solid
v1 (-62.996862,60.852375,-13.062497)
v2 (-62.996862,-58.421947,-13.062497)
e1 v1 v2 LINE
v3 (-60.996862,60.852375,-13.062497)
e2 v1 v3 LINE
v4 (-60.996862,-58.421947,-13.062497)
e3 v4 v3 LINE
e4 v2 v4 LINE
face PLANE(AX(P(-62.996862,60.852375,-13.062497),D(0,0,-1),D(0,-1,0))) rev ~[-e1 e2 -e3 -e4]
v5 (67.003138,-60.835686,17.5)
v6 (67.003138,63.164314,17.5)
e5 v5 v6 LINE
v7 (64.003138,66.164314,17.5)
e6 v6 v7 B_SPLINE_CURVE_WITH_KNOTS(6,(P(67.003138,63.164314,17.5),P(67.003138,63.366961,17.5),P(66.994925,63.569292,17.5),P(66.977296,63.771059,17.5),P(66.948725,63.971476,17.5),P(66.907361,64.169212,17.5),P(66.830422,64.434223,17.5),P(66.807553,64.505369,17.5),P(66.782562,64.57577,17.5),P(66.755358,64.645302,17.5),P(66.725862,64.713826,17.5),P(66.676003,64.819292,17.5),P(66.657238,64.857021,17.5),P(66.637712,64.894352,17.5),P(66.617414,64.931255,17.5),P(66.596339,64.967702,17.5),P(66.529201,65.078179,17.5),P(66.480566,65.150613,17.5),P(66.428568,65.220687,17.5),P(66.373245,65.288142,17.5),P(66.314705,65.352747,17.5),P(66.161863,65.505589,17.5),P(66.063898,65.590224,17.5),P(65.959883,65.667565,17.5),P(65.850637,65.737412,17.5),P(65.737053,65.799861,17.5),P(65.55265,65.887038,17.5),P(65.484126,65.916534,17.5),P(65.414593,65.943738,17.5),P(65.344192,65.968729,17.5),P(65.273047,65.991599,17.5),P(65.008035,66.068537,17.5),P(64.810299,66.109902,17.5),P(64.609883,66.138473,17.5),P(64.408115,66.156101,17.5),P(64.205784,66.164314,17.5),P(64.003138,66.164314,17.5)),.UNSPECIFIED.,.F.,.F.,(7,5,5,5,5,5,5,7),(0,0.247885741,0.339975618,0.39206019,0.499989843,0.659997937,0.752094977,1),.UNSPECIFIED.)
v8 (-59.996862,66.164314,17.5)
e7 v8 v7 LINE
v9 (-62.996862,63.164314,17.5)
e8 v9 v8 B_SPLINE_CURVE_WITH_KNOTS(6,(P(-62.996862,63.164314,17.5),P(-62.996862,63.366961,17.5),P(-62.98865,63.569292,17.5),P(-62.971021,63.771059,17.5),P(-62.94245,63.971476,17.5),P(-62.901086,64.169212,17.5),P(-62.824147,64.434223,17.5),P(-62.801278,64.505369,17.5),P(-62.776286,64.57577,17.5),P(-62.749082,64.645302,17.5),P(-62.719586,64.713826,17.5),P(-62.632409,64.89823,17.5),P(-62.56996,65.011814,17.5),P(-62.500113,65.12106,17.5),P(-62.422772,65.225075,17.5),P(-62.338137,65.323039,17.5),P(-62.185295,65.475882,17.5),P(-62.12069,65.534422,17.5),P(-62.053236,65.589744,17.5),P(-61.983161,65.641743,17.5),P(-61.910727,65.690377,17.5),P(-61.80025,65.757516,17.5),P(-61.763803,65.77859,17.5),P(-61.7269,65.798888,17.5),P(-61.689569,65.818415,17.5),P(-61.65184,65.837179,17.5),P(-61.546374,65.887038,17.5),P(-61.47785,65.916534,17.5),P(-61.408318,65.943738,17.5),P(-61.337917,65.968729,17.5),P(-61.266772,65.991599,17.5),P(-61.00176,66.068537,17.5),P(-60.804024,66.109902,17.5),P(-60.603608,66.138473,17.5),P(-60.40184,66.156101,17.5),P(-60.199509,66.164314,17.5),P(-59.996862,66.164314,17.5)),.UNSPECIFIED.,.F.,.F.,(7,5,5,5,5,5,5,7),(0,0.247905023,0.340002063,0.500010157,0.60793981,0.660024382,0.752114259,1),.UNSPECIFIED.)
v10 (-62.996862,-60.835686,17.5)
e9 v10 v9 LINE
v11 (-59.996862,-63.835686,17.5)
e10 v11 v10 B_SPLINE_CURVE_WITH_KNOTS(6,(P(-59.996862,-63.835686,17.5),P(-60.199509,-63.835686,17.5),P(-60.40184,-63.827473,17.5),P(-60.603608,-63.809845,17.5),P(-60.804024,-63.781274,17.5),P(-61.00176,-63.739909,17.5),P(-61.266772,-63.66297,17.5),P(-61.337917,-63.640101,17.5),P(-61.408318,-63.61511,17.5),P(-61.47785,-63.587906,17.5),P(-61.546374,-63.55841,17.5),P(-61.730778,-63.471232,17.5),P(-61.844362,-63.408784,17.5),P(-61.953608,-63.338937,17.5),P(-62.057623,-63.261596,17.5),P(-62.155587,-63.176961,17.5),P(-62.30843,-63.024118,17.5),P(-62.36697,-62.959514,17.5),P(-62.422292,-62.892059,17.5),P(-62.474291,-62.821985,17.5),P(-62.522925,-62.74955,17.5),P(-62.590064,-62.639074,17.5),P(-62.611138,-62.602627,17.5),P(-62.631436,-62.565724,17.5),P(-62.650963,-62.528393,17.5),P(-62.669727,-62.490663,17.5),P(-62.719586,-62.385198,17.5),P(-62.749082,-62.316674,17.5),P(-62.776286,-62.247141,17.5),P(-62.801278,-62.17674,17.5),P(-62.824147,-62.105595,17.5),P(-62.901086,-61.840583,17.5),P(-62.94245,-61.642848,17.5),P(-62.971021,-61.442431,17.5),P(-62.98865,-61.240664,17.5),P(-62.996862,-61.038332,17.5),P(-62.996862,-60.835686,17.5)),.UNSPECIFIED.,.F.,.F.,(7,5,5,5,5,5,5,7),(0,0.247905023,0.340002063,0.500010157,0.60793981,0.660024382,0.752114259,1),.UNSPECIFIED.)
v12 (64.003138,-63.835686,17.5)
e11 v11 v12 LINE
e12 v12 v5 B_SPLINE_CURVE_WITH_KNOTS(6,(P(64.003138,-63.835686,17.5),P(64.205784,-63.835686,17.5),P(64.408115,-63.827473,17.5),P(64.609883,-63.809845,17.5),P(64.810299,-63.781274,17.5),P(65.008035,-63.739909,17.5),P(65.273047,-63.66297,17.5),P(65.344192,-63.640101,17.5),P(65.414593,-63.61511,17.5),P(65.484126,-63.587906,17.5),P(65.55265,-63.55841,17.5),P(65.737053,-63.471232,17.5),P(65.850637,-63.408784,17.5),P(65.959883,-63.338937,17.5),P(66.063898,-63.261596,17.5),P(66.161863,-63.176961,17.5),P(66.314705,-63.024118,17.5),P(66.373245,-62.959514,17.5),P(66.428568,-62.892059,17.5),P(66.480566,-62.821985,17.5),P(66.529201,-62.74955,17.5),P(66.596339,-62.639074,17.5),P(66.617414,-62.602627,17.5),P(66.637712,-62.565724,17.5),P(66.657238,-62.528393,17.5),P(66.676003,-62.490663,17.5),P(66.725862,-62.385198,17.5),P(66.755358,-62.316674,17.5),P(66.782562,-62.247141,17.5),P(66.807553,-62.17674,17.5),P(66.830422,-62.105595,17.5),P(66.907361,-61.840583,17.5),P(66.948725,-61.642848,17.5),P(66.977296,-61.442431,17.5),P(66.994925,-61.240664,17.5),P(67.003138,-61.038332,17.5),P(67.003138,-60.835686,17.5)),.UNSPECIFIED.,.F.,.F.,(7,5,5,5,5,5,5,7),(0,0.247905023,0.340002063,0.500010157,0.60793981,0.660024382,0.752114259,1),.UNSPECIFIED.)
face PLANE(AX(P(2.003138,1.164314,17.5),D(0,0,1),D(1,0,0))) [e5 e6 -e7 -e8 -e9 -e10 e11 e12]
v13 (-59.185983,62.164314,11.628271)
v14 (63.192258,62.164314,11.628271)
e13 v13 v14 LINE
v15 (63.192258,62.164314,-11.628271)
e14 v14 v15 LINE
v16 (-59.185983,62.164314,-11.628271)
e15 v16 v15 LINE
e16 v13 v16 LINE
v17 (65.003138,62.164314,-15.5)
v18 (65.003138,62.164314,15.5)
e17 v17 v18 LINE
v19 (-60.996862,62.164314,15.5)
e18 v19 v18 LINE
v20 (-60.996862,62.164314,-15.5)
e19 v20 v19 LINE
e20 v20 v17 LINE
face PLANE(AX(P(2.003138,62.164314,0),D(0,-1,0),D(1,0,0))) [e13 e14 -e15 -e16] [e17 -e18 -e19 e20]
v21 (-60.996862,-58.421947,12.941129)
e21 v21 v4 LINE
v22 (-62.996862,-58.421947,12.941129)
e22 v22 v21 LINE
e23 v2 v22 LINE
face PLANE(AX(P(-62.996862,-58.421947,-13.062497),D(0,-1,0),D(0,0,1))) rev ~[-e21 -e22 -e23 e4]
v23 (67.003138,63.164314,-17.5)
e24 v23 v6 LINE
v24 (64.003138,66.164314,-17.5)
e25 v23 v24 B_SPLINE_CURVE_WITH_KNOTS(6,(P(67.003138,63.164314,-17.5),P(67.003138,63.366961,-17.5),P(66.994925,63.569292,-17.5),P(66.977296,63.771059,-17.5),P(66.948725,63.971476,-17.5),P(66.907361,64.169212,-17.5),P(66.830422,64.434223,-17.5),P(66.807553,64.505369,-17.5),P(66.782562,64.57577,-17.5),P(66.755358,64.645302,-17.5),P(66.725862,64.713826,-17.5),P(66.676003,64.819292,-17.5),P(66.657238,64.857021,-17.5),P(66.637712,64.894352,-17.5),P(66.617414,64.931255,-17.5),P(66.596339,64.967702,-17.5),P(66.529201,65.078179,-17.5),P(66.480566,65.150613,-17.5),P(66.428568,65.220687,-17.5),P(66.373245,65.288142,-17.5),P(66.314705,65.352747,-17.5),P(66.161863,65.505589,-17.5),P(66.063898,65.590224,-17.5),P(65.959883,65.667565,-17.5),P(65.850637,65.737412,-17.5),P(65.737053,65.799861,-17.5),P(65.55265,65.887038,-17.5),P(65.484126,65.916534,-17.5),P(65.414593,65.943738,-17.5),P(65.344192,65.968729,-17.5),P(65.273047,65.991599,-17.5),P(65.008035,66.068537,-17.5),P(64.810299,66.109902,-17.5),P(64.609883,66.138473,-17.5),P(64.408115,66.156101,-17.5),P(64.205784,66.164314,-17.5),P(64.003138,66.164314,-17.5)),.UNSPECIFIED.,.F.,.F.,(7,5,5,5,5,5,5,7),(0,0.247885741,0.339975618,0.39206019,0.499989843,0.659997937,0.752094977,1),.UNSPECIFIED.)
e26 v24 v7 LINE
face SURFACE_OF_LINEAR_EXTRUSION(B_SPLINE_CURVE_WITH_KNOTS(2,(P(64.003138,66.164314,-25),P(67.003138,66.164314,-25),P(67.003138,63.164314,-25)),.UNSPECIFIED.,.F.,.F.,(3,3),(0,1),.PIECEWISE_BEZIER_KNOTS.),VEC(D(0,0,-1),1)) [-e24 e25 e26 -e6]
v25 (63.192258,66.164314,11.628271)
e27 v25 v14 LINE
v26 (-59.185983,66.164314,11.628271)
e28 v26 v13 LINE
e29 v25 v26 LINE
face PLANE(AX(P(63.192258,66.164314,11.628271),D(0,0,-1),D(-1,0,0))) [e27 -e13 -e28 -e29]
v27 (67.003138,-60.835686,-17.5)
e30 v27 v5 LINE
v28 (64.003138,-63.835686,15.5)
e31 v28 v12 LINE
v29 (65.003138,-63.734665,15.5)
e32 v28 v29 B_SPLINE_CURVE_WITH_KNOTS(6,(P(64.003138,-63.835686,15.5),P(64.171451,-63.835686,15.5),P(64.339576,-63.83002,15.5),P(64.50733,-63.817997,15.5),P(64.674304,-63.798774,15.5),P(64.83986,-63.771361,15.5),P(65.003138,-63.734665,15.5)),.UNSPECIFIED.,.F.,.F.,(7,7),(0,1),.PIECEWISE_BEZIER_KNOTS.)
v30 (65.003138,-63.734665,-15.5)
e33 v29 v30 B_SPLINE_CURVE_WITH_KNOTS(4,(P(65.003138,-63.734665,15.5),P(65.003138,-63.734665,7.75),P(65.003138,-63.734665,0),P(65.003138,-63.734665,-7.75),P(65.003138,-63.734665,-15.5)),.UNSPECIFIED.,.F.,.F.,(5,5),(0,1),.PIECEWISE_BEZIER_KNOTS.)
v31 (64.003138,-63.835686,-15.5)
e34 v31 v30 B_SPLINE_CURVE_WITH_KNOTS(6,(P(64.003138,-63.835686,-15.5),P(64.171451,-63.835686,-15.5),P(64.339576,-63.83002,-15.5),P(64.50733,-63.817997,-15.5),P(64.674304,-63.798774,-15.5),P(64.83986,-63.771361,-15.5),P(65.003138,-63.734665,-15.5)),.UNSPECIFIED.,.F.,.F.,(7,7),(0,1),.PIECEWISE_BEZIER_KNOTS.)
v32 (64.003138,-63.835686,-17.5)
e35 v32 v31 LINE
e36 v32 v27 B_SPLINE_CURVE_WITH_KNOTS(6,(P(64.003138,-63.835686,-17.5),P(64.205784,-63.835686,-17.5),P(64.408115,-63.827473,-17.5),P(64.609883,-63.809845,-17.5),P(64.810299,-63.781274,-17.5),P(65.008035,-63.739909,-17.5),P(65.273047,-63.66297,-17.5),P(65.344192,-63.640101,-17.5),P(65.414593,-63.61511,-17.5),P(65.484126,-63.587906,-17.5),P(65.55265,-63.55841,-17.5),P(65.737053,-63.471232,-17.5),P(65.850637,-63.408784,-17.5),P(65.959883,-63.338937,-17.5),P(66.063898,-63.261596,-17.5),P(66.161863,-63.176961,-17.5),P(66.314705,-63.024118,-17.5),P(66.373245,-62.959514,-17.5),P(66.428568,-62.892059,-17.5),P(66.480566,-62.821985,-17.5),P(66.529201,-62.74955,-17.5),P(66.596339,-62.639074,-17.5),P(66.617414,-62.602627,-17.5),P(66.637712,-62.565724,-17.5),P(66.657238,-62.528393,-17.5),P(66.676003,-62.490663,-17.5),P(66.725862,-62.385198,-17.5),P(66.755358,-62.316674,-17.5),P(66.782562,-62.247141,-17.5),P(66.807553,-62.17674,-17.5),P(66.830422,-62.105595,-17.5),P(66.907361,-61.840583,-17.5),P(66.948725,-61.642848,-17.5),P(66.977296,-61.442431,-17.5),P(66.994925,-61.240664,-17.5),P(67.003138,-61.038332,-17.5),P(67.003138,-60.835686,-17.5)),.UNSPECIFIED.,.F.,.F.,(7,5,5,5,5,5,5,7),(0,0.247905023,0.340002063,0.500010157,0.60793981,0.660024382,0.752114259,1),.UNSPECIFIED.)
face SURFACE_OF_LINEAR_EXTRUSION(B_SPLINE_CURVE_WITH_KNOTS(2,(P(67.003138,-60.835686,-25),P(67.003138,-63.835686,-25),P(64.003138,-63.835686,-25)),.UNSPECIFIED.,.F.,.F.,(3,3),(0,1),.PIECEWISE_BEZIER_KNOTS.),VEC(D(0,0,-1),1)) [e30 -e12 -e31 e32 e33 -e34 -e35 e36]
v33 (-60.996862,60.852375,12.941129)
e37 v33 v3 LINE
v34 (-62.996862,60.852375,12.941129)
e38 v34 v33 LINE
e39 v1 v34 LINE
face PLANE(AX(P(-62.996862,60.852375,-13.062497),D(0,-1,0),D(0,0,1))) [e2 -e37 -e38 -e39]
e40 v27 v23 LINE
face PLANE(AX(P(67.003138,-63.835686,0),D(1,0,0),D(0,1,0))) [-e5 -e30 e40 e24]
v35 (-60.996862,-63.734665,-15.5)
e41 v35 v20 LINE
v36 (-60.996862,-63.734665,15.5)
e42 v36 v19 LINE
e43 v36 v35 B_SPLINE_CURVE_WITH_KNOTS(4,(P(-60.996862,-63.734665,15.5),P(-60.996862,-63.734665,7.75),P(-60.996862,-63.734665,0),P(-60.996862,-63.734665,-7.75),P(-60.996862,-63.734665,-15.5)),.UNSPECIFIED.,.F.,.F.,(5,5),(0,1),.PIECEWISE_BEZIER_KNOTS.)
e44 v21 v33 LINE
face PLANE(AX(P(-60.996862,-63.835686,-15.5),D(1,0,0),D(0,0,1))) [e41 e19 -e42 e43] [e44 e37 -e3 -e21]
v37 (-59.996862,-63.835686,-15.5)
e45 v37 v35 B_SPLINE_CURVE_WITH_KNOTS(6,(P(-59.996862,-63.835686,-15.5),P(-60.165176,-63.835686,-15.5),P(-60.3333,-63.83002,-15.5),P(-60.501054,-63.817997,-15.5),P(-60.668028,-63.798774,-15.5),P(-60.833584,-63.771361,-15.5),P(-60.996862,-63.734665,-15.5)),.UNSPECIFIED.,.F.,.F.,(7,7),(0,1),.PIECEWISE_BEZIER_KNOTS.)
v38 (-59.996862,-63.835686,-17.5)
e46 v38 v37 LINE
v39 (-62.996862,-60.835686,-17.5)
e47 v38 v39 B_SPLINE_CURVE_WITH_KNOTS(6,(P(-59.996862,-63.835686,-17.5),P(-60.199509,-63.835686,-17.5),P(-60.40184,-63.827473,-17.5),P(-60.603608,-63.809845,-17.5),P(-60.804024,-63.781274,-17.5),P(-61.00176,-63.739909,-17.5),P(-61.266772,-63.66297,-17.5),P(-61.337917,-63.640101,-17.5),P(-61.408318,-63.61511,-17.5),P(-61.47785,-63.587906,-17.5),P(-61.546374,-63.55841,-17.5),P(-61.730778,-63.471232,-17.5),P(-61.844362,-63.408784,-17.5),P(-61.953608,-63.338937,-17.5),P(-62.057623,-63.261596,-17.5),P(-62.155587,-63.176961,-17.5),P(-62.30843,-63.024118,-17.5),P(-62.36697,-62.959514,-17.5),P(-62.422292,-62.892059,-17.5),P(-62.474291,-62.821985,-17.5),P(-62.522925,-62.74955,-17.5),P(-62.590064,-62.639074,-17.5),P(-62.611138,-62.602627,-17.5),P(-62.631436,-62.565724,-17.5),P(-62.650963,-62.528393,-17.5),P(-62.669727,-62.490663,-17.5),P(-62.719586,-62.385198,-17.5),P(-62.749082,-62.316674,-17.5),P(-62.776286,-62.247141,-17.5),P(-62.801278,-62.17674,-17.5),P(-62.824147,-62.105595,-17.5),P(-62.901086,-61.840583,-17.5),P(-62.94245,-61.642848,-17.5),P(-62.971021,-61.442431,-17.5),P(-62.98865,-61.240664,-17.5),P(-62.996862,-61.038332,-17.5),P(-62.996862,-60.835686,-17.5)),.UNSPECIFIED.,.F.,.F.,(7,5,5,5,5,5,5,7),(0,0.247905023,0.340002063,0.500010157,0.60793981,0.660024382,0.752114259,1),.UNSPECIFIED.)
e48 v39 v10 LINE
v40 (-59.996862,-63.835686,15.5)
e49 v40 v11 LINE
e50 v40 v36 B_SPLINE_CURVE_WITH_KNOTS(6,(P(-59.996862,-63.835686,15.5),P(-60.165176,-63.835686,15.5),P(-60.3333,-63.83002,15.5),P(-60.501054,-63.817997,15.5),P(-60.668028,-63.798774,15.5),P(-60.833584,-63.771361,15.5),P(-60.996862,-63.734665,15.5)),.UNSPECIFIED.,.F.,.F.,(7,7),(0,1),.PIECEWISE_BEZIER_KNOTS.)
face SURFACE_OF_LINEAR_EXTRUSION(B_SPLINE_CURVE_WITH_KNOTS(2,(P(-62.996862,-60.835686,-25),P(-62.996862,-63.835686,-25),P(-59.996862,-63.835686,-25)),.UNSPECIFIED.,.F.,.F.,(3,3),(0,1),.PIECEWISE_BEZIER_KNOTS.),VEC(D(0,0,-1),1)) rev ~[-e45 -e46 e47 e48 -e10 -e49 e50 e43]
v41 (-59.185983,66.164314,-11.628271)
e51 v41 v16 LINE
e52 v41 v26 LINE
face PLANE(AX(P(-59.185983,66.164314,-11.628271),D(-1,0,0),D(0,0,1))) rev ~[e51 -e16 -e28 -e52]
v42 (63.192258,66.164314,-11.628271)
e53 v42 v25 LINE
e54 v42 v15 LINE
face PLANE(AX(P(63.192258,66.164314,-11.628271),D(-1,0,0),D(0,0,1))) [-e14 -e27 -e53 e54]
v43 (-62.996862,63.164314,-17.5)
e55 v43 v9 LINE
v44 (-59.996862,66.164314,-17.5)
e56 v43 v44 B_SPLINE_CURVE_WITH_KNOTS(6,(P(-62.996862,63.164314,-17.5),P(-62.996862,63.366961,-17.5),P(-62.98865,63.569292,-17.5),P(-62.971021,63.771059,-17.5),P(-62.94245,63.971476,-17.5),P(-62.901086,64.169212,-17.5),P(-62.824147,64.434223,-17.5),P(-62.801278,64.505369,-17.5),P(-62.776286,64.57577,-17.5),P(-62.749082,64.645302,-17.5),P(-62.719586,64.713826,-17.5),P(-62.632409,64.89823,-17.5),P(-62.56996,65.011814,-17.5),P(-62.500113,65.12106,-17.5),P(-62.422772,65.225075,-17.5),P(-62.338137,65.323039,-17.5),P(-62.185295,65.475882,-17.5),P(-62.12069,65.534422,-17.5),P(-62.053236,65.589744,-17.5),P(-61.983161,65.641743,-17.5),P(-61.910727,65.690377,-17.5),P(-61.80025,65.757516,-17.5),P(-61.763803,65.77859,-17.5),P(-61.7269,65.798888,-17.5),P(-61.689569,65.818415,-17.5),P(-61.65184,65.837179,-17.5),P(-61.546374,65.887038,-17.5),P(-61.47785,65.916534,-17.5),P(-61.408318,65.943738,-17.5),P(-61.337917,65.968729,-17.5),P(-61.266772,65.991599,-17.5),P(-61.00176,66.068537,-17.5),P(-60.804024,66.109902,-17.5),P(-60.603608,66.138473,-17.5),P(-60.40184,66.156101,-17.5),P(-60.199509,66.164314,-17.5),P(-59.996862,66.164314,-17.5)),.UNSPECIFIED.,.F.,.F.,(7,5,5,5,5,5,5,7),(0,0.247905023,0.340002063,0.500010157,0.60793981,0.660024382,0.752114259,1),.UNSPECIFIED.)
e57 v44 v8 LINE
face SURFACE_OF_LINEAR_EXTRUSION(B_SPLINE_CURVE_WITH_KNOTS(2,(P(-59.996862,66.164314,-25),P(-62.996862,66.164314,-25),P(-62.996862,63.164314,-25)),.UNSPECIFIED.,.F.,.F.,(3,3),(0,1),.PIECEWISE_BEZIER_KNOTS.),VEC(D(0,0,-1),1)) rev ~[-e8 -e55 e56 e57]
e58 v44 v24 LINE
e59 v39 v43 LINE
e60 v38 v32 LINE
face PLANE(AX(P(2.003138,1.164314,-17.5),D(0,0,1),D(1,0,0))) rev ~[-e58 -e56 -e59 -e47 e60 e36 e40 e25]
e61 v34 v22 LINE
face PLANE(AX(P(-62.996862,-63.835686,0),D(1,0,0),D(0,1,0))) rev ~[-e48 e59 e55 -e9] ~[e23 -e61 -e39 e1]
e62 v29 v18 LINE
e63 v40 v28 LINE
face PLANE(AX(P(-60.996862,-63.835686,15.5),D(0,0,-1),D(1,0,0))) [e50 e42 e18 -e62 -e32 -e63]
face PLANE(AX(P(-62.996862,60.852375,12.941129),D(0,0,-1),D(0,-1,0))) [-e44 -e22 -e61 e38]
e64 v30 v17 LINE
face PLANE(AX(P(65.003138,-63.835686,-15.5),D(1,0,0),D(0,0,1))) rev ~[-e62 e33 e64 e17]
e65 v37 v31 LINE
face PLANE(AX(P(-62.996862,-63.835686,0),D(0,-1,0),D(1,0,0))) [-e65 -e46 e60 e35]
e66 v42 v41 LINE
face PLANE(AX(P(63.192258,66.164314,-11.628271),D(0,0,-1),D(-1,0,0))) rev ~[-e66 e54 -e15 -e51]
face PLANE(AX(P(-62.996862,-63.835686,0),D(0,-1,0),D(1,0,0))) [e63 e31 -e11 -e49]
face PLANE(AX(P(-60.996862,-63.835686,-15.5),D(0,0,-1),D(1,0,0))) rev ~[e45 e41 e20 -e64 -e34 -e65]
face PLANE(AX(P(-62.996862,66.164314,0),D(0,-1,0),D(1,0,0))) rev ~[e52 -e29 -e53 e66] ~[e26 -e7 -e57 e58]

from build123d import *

# Parameters (mm, degrees)
F0_W        = 130
F0_H        = 130
F1_DEPTH    = 17.5
F2_W        = 126
F2_H        = 31
F3_DEPTH    = 126
F5_W        = 122.3782406645
F5_H        = 23.2565429012
F6_DEPTH    = 7
F4_W        = 119.2743226562
F4_H        = 26.0036256061
F7_DEPTH    = 3
F8_T1_DEPTH = 50


# Not quite as in the source:
# - a fillet or chamfer that OpenCascade refuses, or shapes differently, is made with other operations: its cross-section is extruded or revolved along the edge and cut away or added


with BuildPart() as f1:
    # F0 (on Top) → F1 (new body, symmetric)
    with BuildSketch(Plane.XY):
        with Locations((2.0031377077, 1.1643140912)):
            Rectangle(F0_W, F0_H)
    extrude(amount=F1_DEPTH, both=True)

    # F2 (on face) → F3 (cut)
    with BuildSketch(Plane.XZ.offset(63.8356859088)):
        with Locations((2.0031377077, 0)):
            Rectangle(F2_W, F2_H)
    extrude(amount=-F3_DEPTH, mode=Mode.SUBTRACT)

    # F5 (on face) → F6 (cut)
    with BuildSketch(Plane(origin=(0, 66.1643140912, 0), x_dir=(-1, 0, 0), z_dir=(0, 1, 0))):
        with Locations((-2.0031377077, 0)):
            Rectangle(F5_W, F5_H)
    extrude(amount=-F6_DEPTH, mode=Mode.SUBTRACT)

    # F4 (on face) → F7 (cut)
    with BuildSketch(Plane(origin=(-62.9968622923, 0, 0), x_dir=(0, -1, 0), z_dir=(-1, 0, 0))):
        with Locations((-1.2152138836, -0.0606838628)):
            Rectangle(F4_W, F4_H)
    extrude(amount=-F7_DEPTH, mode=Mode.SUBTRACT)

    # F8: fillet of radius 3 on 4 edges, made by hand

    # F8_s2 → F8_t1 (cut)
    with BuildSketch(Plane.XY.offset(-25)):
        with BuildLine():
            add(Edge.make_bspline(
                [(-59.9968622923, 66.1643140912), (-62.9968622923, 66.1643140912), (-62.9968622923, 63.1643140912)],
                knots=[0, 0, 0, 1, 1, 1], degree=2, weights=[1, 1, 1]))
            Line((-62.9968622923, 63.1643140912), (-62.9968622923, 66.1643140912))
            Line((-62.9968622923, 66.1643140912), (-59.9968622923, 66.1643140912))
        make_face()
        with BuildLine():
            add(Edge.make_bspline(
                [(-62.9968622923, -60.8356859088), (-62.9968622923, -63.8356859088), (-59.9968622923, -63.8356859088)],
                knots=[0, 0, 0, 1, 1, 1], degree=2, weights=[1, 1, 1]))
            Line((-59.9968622923, -63.8356859088), (-62.9968622923, -63.8356859088))
            Line((-62.9968622923, -63.8356859088), (-62.9968622923, -60.8356859088))
        make_face()
        with BuildLine():
            add(Edge.make_bspline(
                [(64.0031377077, 66.1643140912), (67.0031377077, 66.1643140912), (67.0031377077, 63.1643140912)],
                knots=[0, 0, 0, 1, 1, 1], degree=2, weights=[1, 1, 1]))
            Line((67.0031377077, 63.1643140912), (67.0031377077, 66.1643140912))
            Line((67.0031377077, 66.1643140912), (64.0031377077, 66.1643140912))
        make_face()
        with BuildLine():
            add(Edge.make_bspline(
                [(67.0031377077, -60.8356859088), (67.0031377077, -63.8356859088), (64.0031377077, -63.8356859088)],
                knots=[0, 0, 0, 1, 1, 1], degree=2, weights=[1, 1, 1]))
            Line((64.0031377077, -63.8356859088), (67.0031377077, -63.8356859088))
            Line((67.0031377077, -63.8356859088), (67.0031377077, -60.8356859088))
        make_face()
    extrude(amount=F8_T1_DEPTH, mode=Mode.SUBTRACT)


solid = f1.part
